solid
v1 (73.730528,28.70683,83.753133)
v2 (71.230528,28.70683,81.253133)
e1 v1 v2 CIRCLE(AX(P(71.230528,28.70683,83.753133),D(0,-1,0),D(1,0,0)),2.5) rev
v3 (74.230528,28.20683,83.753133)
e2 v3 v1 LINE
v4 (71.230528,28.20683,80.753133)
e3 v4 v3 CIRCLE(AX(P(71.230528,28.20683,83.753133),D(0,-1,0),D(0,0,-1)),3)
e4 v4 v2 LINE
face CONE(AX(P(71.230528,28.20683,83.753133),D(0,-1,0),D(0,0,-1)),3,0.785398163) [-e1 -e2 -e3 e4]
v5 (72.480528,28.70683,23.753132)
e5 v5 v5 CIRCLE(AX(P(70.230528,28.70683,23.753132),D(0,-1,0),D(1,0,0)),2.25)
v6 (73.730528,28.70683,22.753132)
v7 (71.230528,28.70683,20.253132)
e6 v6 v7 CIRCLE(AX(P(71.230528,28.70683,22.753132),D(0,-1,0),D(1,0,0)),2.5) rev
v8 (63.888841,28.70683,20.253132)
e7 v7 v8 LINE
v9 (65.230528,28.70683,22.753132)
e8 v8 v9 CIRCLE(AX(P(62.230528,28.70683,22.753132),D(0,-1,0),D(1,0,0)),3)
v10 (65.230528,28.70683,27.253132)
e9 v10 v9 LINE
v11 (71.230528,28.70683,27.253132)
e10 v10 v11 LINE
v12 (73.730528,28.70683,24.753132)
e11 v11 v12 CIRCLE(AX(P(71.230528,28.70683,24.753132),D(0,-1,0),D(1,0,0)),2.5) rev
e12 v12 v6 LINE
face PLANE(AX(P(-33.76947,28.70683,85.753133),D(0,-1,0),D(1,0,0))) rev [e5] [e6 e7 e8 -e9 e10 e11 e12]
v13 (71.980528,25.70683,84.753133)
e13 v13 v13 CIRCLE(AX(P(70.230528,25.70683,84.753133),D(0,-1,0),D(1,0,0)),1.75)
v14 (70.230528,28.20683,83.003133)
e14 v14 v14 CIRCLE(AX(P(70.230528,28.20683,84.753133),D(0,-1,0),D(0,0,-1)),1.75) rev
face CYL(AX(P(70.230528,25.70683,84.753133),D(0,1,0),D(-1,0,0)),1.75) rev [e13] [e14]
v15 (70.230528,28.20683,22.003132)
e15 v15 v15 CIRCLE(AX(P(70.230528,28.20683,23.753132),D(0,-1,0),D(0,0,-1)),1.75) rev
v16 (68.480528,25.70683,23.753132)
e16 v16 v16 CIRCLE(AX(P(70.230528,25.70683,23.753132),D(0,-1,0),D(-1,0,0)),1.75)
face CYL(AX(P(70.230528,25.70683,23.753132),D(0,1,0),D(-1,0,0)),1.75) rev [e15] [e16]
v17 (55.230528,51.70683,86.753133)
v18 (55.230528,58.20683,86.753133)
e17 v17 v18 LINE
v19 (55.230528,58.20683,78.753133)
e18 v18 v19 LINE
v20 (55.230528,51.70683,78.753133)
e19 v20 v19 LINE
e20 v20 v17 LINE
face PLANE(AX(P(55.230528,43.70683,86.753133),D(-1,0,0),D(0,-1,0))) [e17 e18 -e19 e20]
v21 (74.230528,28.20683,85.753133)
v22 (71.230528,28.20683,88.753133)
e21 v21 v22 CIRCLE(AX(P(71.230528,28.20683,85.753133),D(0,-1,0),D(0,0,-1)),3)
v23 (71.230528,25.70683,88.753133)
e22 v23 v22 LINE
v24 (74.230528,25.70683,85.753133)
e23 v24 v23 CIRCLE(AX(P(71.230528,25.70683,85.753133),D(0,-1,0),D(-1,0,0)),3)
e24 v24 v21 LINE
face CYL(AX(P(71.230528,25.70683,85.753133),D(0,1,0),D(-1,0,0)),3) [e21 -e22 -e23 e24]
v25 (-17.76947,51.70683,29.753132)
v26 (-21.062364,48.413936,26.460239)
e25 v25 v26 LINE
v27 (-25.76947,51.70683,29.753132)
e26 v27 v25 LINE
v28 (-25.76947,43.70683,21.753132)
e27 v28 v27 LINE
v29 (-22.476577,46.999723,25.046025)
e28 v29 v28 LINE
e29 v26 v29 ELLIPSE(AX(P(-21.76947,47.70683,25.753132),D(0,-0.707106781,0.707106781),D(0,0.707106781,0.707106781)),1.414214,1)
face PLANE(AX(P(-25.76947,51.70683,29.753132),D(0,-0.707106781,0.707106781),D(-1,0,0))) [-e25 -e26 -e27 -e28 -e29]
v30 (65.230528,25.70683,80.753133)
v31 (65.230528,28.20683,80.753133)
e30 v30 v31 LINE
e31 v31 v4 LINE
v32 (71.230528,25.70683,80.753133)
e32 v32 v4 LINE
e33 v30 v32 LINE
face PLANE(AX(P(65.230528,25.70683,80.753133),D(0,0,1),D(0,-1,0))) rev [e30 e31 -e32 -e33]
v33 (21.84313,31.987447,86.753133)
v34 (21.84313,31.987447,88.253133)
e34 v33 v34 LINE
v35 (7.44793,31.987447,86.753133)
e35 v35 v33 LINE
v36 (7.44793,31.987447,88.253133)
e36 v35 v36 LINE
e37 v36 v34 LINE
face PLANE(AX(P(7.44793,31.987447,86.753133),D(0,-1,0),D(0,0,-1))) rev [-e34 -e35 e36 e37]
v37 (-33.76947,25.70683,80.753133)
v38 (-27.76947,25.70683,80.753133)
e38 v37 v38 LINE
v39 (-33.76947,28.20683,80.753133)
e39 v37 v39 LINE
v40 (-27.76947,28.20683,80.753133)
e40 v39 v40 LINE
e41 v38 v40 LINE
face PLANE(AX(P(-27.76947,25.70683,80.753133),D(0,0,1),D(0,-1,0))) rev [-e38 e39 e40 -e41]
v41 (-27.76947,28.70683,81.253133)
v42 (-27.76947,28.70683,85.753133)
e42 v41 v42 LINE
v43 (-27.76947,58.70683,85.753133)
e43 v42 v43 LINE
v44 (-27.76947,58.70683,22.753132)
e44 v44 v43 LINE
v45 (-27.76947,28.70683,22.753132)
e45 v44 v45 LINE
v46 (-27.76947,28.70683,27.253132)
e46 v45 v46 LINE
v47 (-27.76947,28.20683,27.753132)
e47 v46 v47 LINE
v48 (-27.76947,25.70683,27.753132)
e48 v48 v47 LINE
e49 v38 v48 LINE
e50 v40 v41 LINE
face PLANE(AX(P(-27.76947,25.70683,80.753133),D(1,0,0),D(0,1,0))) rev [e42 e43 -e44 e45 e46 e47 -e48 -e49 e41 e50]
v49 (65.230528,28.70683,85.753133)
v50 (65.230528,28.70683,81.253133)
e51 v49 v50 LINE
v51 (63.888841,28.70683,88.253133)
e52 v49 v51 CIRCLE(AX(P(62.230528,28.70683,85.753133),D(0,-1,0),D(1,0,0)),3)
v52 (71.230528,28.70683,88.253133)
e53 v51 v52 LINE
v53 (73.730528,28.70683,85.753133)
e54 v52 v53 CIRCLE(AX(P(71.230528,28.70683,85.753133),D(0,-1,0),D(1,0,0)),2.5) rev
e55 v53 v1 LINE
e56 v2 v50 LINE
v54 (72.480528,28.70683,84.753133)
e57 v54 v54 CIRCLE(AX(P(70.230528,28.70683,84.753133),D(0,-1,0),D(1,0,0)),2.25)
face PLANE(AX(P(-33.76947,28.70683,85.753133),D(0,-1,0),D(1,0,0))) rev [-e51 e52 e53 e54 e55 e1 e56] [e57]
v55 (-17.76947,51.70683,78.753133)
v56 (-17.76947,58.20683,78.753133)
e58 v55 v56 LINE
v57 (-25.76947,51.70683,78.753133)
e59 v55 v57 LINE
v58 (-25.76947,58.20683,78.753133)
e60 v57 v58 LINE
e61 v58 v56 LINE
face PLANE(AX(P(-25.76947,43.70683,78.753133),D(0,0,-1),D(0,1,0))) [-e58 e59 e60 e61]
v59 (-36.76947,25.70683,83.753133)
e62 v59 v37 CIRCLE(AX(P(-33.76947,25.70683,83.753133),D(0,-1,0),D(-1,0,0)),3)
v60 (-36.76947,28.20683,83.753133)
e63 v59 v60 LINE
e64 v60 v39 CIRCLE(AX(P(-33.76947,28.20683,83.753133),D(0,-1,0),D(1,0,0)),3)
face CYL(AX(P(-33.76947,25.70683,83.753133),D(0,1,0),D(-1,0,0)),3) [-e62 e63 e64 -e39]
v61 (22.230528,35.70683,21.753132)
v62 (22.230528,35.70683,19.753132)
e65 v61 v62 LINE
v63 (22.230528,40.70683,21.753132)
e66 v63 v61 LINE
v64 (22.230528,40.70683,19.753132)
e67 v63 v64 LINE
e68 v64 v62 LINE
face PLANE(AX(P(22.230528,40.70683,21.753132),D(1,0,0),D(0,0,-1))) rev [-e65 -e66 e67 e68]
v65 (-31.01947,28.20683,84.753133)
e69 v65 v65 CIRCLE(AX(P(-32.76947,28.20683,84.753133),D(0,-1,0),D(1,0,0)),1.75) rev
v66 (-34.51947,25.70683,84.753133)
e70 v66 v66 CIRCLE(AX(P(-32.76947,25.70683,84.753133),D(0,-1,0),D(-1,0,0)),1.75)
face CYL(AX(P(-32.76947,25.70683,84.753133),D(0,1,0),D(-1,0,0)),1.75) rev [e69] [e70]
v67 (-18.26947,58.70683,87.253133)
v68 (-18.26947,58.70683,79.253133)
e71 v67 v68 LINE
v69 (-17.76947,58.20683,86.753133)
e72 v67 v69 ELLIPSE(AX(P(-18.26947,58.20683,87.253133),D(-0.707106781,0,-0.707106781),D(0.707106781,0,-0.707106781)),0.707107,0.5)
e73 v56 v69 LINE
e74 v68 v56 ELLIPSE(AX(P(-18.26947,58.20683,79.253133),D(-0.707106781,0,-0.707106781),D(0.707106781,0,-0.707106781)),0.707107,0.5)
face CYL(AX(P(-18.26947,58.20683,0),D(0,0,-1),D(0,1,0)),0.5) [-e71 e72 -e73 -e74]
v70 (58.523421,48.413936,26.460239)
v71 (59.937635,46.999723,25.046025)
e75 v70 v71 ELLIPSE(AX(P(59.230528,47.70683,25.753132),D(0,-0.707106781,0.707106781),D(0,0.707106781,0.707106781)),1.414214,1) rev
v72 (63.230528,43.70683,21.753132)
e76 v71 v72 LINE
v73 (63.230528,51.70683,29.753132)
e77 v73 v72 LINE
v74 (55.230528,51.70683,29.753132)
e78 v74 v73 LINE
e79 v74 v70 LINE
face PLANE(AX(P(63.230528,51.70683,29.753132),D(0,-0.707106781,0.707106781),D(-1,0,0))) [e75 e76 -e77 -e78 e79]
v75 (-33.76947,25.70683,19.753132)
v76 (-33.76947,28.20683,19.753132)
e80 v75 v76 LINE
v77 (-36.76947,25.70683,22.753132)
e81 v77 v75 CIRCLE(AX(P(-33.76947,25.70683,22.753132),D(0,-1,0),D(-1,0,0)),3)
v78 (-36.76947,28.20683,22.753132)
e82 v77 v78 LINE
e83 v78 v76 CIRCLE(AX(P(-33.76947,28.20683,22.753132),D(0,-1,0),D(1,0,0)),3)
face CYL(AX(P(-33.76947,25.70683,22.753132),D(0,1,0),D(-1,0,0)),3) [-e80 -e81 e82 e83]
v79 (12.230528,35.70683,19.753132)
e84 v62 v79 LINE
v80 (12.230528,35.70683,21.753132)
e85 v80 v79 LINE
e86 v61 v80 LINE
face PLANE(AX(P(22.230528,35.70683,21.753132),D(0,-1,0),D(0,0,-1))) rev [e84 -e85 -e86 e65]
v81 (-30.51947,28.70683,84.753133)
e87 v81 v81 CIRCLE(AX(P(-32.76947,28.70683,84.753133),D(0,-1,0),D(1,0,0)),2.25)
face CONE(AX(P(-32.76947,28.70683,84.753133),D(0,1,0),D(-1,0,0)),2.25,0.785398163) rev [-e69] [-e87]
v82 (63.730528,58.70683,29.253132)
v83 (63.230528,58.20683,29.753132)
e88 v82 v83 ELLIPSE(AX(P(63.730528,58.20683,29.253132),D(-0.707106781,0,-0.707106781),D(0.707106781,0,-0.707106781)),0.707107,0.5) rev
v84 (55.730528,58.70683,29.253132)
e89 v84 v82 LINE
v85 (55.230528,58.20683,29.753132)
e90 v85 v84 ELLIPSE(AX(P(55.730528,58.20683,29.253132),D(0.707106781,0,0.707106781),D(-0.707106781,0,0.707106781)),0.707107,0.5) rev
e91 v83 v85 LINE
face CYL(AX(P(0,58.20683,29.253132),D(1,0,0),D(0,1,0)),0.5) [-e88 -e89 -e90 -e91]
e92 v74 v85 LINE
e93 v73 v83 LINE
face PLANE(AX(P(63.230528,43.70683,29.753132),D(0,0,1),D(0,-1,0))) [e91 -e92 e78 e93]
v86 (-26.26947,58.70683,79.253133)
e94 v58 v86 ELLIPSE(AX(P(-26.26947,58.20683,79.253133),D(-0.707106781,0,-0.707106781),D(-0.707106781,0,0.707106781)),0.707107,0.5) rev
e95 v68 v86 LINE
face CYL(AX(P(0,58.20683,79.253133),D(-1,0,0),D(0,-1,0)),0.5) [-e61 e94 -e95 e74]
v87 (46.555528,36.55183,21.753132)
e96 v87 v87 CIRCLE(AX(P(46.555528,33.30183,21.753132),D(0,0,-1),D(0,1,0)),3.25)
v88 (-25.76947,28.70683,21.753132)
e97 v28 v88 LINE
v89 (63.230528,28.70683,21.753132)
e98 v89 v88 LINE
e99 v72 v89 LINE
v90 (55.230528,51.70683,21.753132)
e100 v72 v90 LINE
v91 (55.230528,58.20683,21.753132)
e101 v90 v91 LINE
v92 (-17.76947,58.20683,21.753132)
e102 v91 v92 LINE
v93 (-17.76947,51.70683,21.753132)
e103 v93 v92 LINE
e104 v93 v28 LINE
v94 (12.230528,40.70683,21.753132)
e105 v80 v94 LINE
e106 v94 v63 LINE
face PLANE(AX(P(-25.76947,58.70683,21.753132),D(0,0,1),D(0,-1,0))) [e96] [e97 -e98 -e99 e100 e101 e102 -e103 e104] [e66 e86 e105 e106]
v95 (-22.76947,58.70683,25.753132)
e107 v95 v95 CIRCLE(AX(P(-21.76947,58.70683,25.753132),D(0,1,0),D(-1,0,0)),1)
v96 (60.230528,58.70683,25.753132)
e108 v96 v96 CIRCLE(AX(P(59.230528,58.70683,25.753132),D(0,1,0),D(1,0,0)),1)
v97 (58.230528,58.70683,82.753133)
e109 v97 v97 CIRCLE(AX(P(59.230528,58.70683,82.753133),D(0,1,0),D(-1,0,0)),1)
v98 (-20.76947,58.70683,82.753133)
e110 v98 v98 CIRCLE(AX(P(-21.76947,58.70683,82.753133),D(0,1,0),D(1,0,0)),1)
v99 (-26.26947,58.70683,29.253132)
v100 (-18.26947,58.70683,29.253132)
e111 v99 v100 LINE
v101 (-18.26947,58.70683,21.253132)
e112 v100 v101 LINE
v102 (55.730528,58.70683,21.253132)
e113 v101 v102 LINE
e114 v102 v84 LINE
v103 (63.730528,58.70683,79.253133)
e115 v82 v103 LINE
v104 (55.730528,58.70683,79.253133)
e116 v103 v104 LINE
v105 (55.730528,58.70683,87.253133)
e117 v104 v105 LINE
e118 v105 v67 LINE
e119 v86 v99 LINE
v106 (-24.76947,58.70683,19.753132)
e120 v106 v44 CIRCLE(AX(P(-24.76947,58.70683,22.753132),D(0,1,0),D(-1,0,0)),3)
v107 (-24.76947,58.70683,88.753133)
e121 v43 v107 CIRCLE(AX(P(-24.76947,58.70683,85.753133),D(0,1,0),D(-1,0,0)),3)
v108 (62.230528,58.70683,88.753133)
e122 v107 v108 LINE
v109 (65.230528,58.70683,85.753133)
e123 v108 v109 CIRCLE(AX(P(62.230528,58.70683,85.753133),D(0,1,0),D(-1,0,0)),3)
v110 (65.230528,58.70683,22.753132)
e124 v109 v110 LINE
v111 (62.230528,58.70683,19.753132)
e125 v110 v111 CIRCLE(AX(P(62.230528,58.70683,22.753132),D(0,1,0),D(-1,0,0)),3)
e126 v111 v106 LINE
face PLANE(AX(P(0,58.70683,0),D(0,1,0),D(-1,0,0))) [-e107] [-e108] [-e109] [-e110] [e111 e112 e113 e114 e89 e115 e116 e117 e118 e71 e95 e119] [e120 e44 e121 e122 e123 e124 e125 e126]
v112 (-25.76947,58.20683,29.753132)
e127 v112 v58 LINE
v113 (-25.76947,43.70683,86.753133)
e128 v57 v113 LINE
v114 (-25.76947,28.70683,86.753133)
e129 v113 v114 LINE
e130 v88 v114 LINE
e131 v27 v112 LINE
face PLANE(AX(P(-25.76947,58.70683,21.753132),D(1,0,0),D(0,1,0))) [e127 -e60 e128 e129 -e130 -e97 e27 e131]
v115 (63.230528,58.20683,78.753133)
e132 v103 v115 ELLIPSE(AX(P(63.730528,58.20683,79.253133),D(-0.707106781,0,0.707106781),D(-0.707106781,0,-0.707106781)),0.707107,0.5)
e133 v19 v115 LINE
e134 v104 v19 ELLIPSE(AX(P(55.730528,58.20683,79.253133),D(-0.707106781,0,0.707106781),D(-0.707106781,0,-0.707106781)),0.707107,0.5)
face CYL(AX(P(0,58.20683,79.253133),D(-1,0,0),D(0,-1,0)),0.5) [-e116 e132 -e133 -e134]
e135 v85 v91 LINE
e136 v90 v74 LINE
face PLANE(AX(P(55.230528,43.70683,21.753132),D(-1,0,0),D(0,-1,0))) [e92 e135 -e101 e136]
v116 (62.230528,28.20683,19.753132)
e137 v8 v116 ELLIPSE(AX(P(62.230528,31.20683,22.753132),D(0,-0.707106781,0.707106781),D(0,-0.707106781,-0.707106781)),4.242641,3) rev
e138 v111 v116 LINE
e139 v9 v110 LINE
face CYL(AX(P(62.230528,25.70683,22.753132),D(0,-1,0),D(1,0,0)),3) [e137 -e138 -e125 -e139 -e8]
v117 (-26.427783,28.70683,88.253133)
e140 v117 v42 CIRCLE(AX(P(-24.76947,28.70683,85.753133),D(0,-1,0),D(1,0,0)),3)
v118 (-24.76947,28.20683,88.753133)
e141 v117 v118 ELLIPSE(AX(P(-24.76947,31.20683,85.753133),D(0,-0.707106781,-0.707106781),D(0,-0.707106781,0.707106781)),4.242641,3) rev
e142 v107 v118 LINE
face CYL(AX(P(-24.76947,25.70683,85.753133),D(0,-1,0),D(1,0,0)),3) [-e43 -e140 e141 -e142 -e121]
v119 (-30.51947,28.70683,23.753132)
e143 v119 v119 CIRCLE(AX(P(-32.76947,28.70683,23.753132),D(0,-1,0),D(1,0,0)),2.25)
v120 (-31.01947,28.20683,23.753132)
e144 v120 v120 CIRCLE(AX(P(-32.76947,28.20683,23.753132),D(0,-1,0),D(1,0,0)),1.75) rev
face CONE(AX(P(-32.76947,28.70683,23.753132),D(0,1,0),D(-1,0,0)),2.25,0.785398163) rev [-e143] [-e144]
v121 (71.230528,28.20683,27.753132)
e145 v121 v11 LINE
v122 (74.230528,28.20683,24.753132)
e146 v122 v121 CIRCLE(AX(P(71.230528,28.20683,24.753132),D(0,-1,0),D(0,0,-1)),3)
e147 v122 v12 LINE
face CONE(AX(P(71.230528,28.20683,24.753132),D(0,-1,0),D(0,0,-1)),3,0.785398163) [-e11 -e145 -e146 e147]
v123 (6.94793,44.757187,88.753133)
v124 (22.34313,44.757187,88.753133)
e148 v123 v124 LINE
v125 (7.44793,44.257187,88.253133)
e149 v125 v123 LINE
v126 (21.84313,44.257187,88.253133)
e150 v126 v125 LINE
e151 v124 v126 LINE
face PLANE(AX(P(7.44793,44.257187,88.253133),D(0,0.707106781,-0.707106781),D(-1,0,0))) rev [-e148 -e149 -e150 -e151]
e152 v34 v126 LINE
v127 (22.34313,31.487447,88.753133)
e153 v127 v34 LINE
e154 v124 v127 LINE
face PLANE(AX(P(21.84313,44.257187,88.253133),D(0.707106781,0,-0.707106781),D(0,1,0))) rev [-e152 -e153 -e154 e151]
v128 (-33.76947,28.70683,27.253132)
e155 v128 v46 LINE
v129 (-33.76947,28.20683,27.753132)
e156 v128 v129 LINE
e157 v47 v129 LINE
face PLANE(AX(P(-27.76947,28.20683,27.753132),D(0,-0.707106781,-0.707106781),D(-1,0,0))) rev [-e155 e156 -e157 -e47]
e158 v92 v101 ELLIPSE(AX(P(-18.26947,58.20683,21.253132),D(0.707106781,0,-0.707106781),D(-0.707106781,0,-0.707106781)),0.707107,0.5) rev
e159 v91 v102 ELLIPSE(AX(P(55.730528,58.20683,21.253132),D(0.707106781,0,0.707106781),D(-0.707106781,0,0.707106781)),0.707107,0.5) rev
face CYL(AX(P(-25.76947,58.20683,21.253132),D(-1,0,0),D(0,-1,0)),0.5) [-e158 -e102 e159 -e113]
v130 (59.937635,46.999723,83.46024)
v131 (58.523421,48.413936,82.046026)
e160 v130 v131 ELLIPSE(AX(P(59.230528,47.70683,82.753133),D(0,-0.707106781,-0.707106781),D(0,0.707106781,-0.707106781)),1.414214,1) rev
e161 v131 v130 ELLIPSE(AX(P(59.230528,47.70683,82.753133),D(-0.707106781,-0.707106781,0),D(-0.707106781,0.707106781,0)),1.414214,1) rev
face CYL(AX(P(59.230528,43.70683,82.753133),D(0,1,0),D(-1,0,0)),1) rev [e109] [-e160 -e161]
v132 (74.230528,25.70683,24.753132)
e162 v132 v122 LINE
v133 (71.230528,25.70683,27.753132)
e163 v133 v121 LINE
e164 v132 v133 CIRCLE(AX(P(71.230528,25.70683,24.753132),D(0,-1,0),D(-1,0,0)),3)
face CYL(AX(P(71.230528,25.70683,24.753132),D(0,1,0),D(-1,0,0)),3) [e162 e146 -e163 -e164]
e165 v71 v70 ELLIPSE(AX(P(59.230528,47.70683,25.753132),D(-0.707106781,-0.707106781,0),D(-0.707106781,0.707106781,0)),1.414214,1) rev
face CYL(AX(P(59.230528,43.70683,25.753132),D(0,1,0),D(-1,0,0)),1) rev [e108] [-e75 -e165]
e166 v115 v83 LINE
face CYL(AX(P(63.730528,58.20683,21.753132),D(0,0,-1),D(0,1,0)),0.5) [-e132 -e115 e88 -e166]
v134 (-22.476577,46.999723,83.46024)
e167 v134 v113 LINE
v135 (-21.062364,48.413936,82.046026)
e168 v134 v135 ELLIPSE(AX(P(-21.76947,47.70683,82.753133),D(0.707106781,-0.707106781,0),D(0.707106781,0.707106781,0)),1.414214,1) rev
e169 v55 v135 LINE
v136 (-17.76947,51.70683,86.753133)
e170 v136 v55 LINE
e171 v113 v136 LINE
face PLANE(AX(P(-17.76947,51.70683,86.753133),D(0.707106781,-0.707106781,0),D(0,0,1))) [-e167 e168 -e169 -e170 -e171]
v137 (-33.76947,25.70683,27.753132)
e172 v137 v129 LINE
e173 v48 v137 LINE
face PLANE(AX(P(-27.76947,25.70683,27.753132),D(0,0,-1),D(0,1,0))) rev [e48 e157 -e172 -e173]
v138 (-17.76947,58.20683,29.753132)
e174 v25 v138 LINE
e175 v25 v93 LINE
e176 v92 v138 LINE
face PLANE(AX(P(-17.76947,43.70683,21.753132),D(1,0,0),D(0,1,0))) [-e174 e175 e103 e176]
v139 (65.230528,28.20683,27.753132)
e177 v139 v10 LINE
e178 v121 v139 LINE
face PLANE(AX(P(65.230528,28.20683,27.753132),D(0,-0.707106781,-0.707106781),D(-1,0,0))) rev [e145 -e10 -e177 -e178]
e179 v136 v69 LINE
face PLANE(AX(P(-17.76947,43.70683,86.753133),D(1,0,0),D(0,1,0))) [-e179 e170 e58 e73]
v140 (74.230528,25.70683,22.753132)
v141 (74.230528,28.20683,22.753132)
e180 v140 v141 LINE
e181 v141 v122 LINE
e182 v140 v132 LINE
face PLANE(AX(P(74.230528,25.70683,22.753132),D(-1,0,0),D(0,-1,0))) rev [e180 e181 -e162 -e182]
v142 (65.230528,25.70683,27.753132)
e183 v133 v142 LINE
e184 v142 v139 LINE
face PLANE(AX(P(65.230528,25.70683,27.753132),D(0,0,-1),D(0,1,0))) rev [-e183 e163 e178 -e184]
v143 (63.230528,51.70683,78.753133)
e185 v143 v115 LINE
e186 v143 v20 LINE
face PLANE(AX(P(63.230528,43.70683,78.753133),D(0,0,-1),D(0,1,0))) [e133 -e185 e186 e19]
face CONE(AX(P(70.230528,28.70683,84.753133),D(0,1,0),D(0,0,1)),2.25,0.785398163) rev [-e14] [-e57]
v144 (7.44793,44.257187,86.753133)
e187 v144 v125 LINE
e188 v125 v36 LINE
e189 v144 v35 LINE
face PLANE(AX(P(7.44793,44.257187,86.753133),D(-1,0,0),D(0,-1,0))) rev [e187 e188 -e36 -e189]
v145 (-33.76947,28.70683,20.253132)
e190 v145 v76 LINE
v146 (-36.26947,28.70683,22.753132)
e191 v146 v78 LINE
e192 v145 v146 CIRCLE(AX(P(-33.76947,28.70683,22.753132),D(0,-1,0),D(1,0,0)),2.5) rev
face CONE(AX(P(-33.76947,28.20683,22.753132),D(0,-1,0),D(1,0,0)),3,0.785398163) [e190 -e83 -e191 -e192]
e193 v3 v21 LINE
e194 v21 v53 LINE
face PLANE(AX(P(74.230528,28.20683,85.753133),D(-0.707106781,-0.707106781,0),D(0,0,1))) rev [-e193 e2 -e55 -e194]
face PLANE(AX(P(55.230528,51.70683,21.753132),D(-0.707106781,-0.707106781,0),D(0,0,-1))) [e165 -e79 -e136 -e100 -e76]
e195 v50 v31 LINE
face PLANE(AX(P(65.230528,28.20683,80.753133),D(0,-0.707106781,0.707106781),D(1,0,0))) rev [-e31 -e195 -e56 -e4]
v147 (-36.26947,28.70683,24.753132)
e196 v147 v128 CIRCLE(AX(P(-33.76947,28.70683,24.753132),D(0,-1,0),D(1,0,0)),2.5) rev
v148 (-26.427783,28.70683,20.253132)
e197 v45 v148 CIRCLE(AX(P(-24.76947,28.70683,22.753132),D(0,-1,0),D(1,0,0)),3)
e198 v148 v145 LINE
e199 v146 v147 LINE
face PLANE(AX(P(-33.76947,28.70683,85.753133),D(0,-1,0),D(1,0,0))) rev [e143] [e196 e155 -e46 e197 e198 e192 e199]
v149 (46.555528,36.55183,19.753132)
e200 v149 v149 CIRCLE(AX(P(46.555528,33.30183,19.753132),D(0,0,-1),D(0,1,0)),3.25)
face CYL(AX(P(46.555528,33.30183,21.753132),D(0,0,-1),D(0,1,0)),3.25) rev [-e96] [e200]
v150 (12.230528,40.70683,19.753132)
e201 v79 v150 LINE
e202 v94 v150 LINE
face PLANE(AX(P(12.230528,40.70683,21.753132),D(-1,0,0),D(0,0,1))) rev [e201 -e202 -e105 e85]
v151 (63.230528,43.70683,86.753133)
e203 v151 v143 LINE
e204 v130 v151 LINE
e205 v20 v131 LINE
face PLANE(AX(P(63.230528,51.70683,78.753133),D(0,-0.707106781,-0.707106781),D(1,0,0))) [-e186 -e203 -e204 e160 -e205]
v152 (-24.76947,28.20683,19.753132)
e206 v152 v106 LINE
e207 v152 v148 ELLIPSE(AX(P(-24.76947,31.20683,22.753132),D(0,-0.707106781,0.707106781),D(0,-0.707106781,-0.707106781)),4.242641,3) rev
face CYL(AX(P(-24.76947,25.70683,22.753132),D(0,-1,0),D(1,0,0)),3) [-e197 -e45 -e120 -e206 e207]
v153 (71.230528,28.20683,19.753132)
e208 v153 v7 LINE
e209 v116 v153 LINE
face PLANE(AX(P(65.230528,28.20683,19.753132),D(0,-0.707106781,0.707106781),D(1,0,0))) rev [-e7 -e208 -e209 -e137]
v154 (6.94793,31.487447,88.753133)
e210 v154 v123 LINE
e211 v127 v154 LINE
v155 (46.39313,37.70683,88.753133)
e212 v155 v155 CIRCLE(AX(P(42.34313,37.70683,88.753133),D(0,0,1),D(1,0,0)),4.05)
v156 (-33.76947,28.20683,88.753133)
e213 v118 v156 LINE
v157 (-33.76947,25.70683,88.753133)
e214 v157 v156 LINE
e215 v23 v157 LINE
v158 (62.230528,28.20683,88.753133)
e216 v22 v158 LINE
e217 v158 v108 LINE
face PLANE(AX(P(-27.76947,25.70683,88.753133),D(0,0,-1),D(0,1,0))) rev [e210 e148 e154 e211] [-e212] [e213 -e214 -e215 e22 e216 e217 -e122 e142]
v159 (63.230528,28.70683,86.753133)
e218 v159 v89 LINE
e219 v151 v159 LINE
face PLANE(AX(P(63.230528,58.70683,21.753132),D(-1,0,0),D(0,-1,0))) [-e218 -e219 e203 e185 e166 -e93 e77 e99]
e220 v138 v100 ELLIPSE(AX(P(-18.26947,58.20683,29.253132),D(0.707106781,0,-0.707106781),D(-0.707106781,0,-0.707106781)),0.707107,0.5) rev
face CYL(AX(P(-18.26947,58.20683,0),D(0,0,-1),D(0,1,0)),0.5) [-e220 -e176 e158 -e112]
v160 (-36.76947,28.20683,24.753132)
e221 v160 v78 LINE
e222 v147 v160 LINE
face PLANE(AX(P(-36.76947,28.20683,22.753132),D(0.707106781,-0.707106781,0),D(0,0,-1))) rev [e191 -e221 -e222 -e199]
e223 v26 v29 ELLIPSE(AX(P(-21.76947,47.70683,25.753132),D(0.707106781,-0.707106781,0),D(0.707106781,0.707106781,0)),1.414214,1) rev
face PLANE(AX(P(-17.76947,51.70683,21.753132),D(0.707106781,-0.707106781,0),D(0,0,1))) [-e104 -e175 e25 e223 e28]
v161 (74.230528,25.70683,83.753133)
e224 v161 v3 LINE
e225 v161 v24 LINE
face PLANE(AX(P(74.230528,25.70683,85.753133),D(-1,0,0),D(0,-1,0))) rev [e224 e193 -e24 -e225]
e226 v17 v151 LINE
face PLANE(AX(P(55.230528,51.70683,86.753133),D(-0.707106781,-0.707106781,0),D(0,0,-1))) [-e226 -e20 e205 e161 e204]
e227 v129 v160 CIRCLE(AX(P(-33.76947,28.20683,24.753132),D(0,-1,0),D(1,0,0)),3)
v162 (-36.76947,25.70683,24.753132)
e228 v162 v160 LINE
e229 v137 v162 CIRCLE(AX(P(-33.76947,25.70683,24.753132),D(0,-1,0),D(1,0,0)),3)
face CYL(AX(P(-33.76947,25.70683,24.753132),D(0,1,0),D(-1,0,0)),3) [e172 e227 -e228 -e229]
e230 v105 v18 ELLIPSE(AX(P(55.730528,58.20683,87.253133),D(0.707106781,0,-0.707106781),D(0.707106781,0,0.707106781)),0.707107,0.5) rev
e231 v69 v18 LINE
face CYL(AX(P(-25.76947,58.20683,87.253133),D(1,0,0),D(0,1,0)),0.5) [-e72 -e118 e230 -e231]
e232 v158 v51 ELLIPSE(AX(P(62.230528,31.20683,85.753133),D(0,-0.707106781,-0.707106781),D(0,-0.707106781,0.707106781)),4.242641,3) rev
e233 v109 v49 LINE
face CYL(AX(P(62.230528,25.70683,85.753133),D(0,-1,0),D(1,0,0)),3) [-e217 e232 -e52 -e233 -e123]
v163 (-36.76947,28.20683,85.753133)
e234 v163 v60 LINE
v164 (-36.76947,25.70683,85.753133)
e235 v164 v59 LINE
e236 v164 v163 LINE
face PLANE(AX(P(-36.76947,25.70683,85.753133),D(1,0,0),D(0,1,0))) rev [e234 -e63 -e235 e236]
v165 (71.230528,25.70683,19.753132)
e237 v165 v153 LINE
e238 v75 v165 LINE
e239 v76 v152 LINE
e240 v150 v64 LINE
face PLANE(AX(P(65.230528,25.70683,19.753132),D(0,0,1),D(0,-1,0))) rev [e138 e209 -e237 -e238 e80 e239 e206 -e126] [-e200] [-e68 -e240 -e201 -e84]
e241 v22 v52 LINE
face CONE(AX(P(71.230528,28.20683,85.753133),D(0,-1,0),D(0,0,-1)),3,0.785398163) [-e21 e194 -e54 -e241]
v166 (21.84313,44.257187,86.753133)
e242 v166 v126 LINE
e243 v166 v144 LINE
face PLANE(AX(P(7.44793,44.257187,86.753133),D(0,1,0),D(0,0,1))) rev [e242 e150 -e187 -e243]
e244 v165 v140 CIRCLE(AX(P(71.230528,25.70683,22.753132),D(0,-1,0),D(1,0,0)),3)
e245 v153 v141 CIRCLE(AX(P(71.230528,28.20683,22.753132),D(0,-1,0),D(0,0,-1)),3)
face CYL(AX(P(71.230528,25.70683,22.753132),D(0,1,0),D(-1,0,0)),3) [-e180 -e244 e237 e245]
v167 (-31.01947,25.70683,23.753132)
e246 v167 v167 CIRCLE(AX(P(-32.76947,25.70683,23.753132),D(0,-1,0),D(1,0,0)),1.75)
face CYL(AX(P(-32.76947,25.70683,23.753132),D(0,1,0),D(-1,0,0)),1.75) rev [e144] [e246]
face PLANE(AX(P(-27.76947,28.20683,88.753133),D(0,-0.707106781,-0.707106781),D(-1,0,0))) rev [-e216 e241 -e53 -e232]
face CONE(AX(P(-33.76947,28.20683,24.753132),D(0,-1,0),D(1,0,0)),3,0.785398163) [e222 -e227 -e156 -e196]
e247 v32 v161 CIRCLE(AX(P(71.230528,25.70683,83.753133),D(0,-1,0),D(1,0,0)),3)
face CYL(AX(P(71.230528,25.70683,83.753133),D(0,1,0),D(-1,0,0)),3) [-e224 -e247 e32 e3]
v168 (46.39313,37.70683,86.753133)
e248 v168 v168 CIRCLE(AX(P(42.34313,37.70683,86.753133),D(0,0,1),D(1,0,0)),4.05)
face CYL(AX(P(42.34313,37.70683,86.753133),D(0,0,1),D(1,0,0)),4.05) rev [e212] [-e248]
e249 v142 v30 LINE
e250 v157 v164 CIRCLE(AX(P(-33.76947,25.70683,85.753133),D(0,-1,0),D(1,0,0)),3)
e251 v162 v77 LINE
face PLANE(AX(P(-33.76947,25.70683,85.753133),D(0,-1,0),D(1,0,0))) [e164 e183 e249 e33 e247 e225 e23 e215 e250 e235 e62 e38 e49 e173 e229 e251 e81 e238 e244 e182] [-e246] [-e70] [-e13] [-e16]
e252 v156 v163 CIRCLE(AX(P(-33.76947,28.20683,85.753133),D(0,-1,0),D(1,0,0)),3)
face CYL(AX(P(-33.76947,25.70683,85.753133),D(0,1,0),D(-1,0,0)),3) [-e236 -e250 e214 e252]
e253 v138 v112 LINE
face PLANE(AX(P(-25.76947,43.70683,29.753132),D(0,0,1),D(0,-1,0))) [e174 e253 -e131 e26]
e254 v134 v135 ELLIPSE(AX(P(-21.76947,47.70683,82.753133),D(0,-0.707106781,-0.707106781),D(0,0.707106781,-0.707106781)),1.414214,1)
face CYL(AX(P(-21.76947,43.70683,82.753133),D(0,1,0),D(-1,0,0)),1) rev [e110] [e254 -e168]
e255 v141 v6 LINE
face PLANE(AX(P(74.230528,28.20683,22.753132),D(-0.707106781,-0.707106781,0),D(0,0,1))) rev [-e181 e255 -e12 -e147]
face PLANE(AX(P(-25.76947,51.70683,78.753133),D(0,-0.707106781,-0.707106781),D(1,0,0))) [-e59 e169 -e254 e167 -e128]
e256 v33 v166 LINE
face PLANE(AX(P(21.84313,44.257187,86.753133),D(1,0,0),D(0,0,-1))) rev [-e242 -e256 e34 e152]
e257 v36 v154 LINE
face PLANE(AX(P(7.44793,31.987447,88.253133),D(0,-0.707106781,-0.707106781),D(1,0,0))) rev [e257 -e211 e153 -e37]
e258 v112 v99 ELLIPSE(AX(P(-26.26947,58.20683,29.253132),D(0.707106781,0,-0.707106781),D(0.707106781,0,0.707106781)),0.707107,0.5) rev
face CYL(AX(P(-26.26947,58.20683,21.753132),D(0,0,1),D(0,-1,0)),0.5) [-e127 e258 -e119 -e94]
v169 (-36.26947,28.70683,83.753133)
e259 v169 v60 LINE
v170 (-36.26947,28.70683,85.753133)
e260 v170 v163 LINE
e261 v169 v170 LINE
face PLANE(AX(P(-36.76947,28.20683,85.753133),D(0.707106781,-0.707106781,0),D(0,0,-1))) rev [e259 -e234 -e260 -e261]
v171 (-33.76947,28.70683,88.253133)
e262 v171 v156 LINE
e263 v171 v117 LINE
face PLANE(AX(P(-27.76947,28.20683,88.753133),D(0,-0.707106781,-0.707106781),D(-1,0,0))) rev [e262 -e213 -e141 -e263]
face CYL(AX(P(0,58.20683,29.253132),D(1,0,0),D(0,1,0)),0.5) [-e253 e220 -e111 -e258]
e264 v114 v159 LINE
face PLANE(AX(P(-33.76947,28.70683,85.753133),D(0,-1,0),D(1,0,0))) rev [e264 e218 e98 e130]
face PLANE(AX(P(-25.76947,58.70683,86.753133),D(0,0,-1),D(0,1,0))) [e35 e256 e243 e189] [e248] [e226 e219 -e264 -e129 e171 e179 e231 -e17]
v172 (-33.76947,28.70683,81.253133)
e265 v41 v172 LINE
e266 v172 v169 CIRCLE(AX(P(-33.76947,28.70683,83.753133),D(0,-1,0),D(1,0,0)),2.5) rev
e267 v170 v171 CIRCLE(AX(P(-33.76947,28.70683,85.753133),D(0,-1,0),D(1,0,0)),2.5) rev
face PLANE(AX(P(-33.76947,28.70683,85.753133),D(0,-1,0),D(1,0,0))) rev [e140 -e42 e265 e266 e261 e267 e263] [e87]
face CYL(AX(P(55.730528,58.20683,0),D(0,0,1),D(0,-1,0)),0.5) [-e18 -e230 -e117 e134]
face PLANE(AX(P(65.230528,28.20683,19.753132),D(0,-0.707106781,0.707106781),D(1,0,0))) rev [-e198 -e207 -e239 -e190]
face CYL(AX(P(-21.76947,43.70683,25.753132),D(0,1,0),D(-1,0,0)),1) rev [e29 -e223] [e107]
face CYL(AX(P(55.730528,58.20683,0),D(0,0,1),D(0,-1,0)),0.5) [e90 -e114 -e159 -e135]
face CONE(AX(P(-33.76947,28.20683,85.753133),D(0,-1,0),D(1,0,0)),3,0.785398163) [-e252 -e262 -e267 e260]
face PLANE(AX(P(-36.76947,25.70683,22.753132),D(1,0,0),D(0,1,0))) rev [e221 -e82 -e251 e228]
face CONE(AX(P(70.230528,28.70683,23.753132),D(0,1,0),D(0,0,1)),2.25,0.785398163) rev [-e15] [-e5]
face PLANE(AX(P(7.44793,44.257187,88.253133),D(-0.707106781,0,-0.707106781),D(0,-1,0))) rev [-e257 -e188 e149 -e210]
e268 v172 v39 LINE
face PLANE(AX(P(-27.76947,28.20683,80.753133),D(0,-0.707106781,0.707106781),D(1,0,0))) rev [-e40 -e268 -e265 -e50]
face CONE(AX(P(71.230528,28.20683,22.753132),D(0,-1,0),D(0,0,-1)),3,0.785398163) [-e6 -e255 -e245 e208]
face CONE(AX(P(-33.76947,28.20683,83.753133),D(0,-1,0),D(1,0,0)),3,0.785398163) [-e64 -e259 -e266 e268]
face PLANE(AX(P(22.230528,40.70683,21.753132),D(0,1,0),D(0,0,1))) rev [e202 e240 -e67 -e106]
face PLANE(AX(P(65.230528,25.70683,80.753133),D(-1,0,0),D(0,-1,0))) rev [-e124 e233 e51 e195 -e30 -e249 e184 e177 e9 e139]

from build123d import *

# Parameters (mm, degrees)
SKETCH1_R           = 1.75
BOSS_EXTRUDE1_DEPTH = 3
SKETCH2_W           = 92.99999868
SKETCH2_H           = 69.000001
SKETCH2_W_2         = 88.99999868
SKETCH2_H_2         = 65.000001
BOSS_EXTRUDE2_DEPTH = 30
SKETCH3_W           = 8
SKETCH3_H           = 8
SKETCH3_R           = 1
BOSS_EXTRUDE3_DEPTH = 15
CHAMFER1_SIZE       = 8
SKETCH4_R           = 3.25
CUT_EXTRUDE1_DEPTH  = 2
SKETCH5_W           = 14.3952
SKETCH5_H           = 12.269740894
CUT_EXTRUDE2_DEPTH  = 2
CHAMFER2_SIZE       = 0.5
FILLET1_R           = 3
CHAMFER4_SIZE       = 0.5
FILLET2_R           = 0.5
SKETCH6_R           = 4.05
CUT_EXTRUDE3_DEPTH  = 2
SKETCH7_W           = 10
SKETCH7_H           = 5
CUT_EXTRUDE4_DEPTH  = 2


with BuildPart() as part:
    # Sketch1 → Boss-Extrude1 (new body)
    with BuildSketch(Plane(origin=(0, 28.706829644, 0), x_dir=(-1, 0, 0), z_dir=(0, -1, 0))):
        with BuildLine():
            Line((27.769470492, -88.753133266), (-65.230528188, -88.753133266))
            Line((-65.230528188, -88.753133266), (-71.230528188, -88.753133266))
            ThreePointArc((-71.230528188, -88.753133266), (-73.351848531, -87.874453609), (-74.230528188, -85.753133266))
            Line((-74.230528188, -85.753133266), (-74.230528188, -83.753133266))
            ThreePointArc((-74.230528188, -83.753133266), (-73.351848531, -81.631812922), (-71.230528188, -80.753133266))
            Line((-71.230528188, -80.753133266), (-65.230528188, -80.753133266))
            Line((-65.230528188, -80.753133266), (-65.230528188, -27.753132266))
            Line((-65.230528188, -27.753132266), (-71.230528188, -27.753132266))
            ThreePointArc((-71.230528188, -27.753132266), (-73.351848531, -26.874452609), (-74.230528188, -24.753132266))
            Line((-74.230528188, -24.753132266), (-74.230528188, -22.753132266))
            ThreePointArc((-74.230528188, -22.753132266), (-73.351848531, -20.631811922), (-71.230528188, -19.753132266))
            Line((-71.230528188, -19.753132266), (-65.230528188, -19.753132266))
            Line((-65.230528188, -19.753132266), (27.769470492, -19.753132266))
            Line((27.769470492, -19.753132266), (33.769470492, -19.753132266))
            ThreePointArc((33.769470492, -19.753132266), (35.890790836, -20.631811922), (36.769470492, -22.753132266))
            Line((36.769470492, -22.753132266), (36.769470492, -24.753132266))
            ThreePointArc((36.769470492, -24.753132266), (35.890790836, -26.874452609), (33.769470492, -27.753132266))
            Line((33.769470492, -27.753132266), (27.769470492, -27.753132266))
            Line((27.769470492, -27.753132266), (27.769470492, -80.753133266))
            Line((27.769470492, -80.753133266), (33.769470492, -80.753133266))
            ThreePointArc((33.769470492, -80.753133266), (35.890790836, -81.631812922), (36.769470492, -83.753133266))
            Line((36.769470492, -83.753133266), (36.769470492, -85.753133266))
            ThreePointArc((36.769470492, -85.753133266), (35.890790836, -87.874453609), (33.769470492, -88.753133266))
            Line((33.769470492, -88.753133266), (27.769470492, -88.753133266))
        make_face()
        with Locations(Location((32.769470492, -23.753132266, 0), (0, 0, 180))):
            Circle(SKETCH1_R, mode=Mode.SUBTRACT)
        with Locations((-70.230528188, -23.753132266)):
            Circle(SKETCH1_R, mode=Mode.SUBTRACT)
        with Locations(Location((-70.230528188, -84.753133266, 0), (0, 0, 180))):
            Circle(SKETCH1_R, mode=Mode.SUBTRACT)
        with Locations((32.769470492, -84.753133266)):
            Circle(SKETCH1_R, mode=Mode.SUBTRACT)
    extrude(amount=BOSS_EXTRUDE1_DEPTH)

    # Sketch2 → Boss-Extrude2 (add)
    with BuildSketch(Plane(origin=(0, 28.706829644, 0), x_dir=(1, 0, 0), z_dir=(0, 1, 0))):
        with Locations((18.730528848, -54.253132766)):
            Rectangle(SKETCH2_W, SKETCH2_H)
        with Locations((18.730528848, -54.253132766)):
            Rectangle(SKETCH2_W_2, SKETCH2_H_2, mode=Mode.SUBTRACT)
    extrude(amount=BOSS_EXTRUDE2_DEPTH)

    # Sketch3 → Boss-Extrude3 (add)
    # profile 1 of 4: a face of its own
    with BuildSketch(Plane(origin=(0, 58.706829644, 0), x_dir=(1, 0, 0), z_dir=(0, 1, 0))):
        with Locations((-21.769470492, -25.753132266)):
            Rectangle(SKETCH3_W, SKETCH3_H)
        with Locations(Location((-21.769470492, -25.753132266, 0), (0, 0, 180))):
            Circle(SKETCH3_R, mode=Mode.SUBTRACT)
    # profile 2 of 4: a face of its own
    with BuildSketch(Plane(origin=(0, 58.706829644, 0), x_dir=(1, 0, 0), z_dir=(0, 1, 0))):
        with Locations((59.230528188, -25.753132266)):
            Rectangle(SKETCH3_W, SKETCH3_H)
        with Locations((59.230528188, -25.753132266)):
            Circle(SKETCH3_R, mode=Mode.SUBTRACT)
    # profile 3 of 4: a face of its own
    with BuildSketch(Plane(origin=(0, 58.706829644, 0), x_dir=(1, 0, 0), z_dir=(0, 1, 0))):
        with Locations((59.230528188, -82.753133266)):
            Rectangle(SKETCH3_W, SKETCH3_H)
        with Locations(Location((59.230528188, -82.753133266, 0), (0, 0, 180))):
            Circle(SKETCH3_R, mode=Mode.SUBTRACT)
    # profile 4 of 4: a face of its own
    with BuildSketch(Plane(origin=(0, 58.706829644, 0), x_dir=(1, 0, 0), z_dir=(0, 1, 0))):
        with Locations((-21.769470492, -82.753133266)):
            Rectangle(SKETCH3_W, SKETCH3_H)
        with Locations((-21.769470492, -82.753133266)):
            Circle(SKETCH3_R, mode=Mode.SUBTRACT)
    extrude(amount=-BOSS_EXTRUDE3_DEPTH)

    # Chamfer1
    # the kernel refuses this chamfer: 8 mm, written as the material it takes off along each edge
    with BuildSketch(Plane(origin=(-17.769470492, 43.706829644, 21.753132266), x_dir=(-0.9996219169112963, -0.027495876610600302, 0), z_dir=(0, 0, 1)), Plane(origin=(2.803993411, 43.706829644, 29.753132266), x_dir=(0, -0.027495876610596853, -0.9996219169112965), z_dir=(-1, 0, 0)), Plane(origin=(2.803993411, 43.706829644, 78.753133266), x_dir=(-1.3984416378867394e-14, 0.9996219169112965, -0.027495876610597703), z_dir=(-1, 0, 0)), Plane(origin=(-17.769470492, 43.706829644, 86.753133266), x_dir=(0.02749587661057268, 0.9996219169112972, -1.045466831585503e-14), z_dir=(0, 0, -1)), Plane(origin=(34.657064284, 43.706829644, 29.753132266), x_dir=(-1.4167575710639342e-14, 0.999621916911297, 0.0274958766105757), z_dir=(1, 0, 0)), Plane(origin=(55.230528188, 43.706829644, 21.753132266), x_dir=(-0.027495876610600312, 0.9996219169112963, -1.0650038269745103e-14), z_dir=(0, 0, 1))) as chamfer1_piece_1:
        Polygon((CHAMFER1_SIZE * 0.999621916911, -CHAMFER1_SIZE * 0.0274958766106), (-CHAMFER1_SIZE * 0.0274958766106, -CHAMFER1_SIZE * 0.999621916911), (0, 0), align=None)
    extrude(amount=28.573463904, mode=Mode.SUBTRACT)
    with BuildSketch(Plane(origin=(55.230528188, 43.706829644, 86.753133266), x_dir=(-0.027495876610600312, 0.9996219169112963, -1.0259298361964941e-14), z_dir=(0, 0, -1)), Plane(origin=(34.657064284, 43.706829644, 78.753133266), x_dir=(-1.4082101355812438e-14, 0.9996219169112965, -0.027495876610597703), z_dir=(1, 0, 0))) as chamfer1_piece_2:
        Polygon((CHAMFER1_SIZE * 0.999621916911, CHAMFER1_SIZE * 0.0274958766106), (-CHAMFER1_SIZE * 0.0274958766106, CHAMFER1_SIZE * 0.999621916911), (0, 0), align=None)
    extrude(amount=28.573463904, mode=Mode.SUBTRACT)

    # Sketch4 → Cut-Extrude1 (cut)
    with BuildSketch(Plane(origin=(0, 0, 19.753132266), x_dir=(-1, 0, 0), z_dir=(0, 0, -1))):
        with Locations(Location((-46.555528188, 33.301829644, 0), (0, 0, 90))):
            Circle(SKETCH4_R)
    extrude(amount=-CUT_EXTRUDE1_DEPTH, mode=Mode.SUBTRACT)

    # Sketch5 → Cut-Extrude2 (cut)
    with BuildSketch(Plane.XY.offset(88.753133266)):
        with Locations((14.645530209, 38.12231703)):
            Rectangle(SKETCH5_W, SKETCH5_H)
    extrude(amount=-CUT_EXTRUDE2_DEPTH, mode=Mode.SUBTRACT)

    # Chamfer2
    chamfer2_edges = [part.edges().sort_by_distance(p)[0] for p in [
        (7.447930209, 38.12231703, 88.753133266),
        (14.645530209, 31.987446583, 88.753133266),
        (21.843130209, 38.12231703, 88.753133266),
        (14.645530209, 44.257187477, 88.753133266),
    ]]
    chamfer(chamfer2_edges, length=CHAMFER2_SIZE)

    # Fillet1
    fillet1_edges = [part.edges().sort_by_distance(p)[0] for p in [
        (-27.769470492, 43.706829644, 19.753132266),
        (-27.769470492, 43.706829644, 88.753133266),
        (65.230528188, 43.706829644, 88.753133266),
        (65.230528188, 43.706829644, 19.753132266),
    ]]
    fillet(fillet1_edges, radius=FILLET1_R)

    # Chamfer4
    chamfer4_edges = [part.edges().sort_by_distance(p)[0] for p in [
        (66.730528188, 28.706829644, 88.753133266),
        (73.351848531, 28.706829644, 87.874453609),
        (74.230528188, 28.706829644, 84.753133266),
        (73.351848531, 28.706829644, 81.631812922),
        (68.230528188, 28.706829644, 80.753133266),
        (68.230528188, 28.706829644, 27.753132266),
        (73.351848531, 28.706829644, 26.874452609),
        (74.230528188, 28.706829644, 23.753132266),
        (73.351848531, 28.706829644, 20.631811922),
        (-29.269470492, 28.706829644, 19.753132266),
        (-35.890790836, 28.706829644, 20.631811922),
        (-36.769470492, 28.706829644, 23.753132266),
        (-35.890790836, 28.706829644, 26.874452609),
        (-30.769470492, 28.706829644, 27.753132266),
        (-30.769470492, 28.706829644, 80.753133266),
        (-35.890790836, 28.706829644, 81.631812922),
        (-36.769470492, 28.706829644, 84.753133266),
        (-35.890790836, 28.706829644, 87.874453609),
        (-34.519470492, 28.706829644, 23.753132266),
        (71.980528188, 28.706829644, 23.753132266),
        (68.480528188, 28.706829644, 84.753133266),
        (-31.019470492, 28.706829644, 84.753133266),
        (-29.269470492, 28.706829644, 88.753133266),
        (66.730528188, 28.706829644, 19.753132266),
    ]]
    chamfer(chamfer4_edges, length=CHAMFER4_SIZE)

    # Fillet2
    fillet2_edges = [part.edges().sort_by_distance(p)[0] for p in [
        (-25.769470492, 58.706829644, 54.253132766),
        (-21.769470492, 58.706829644, 29.753132266),
        (-17.769470492, 58.706829644, 25.753132266),
        (18.730528848, 58.706829644, 21.753132266),
        (55.230528188, 58.706829644, 25.753132266),
        (59.230528188, 58.706829644, 29.753132266),
        (63.230528188, 58.706829644, 54.253132766),
        (59.230528188, 58.706829644, 78.753133266),
        (55.230528188, 58.706829644, 82.753133266),
        (18.730528848, 58.706829644, 86.753133266),
        (-17.769470492, 58.706829644, 82.753133266),
        (-21.769470492, 58.706829644, 78.753133266),
    ]]
    fillet(fillet2_edges, radius=FILLET2_R)

    # Sketch6 → Cut-Extrude3 (cut)
    with BuildSketch(Plane.XY.offset(88.753133266)):
        with Locations((42.343130209, 37.706829644)):
            Circle(SKETCH6_R)
    extrude(amount=-CUT_EXTRUDE3_DEPTH, mode=Mode.SUBTRACT)

    # Sketch7 → Cut-Extrude4 (cut)
    with BuildSketch(Plane(origin=(0, 0, 19.753132266), x_dir=(-1, 0, 0), z_dir=(0, 0, -1))):
        with Locations((-17.230528188, 38.206829644)):
            Rectangle(SKETCH7_W, SKETCH7_H)
    extrude(amount=-CUT_EXTRUDE4_DEPTH, mode=Mode.SUBTRACT)


solid = part.part
